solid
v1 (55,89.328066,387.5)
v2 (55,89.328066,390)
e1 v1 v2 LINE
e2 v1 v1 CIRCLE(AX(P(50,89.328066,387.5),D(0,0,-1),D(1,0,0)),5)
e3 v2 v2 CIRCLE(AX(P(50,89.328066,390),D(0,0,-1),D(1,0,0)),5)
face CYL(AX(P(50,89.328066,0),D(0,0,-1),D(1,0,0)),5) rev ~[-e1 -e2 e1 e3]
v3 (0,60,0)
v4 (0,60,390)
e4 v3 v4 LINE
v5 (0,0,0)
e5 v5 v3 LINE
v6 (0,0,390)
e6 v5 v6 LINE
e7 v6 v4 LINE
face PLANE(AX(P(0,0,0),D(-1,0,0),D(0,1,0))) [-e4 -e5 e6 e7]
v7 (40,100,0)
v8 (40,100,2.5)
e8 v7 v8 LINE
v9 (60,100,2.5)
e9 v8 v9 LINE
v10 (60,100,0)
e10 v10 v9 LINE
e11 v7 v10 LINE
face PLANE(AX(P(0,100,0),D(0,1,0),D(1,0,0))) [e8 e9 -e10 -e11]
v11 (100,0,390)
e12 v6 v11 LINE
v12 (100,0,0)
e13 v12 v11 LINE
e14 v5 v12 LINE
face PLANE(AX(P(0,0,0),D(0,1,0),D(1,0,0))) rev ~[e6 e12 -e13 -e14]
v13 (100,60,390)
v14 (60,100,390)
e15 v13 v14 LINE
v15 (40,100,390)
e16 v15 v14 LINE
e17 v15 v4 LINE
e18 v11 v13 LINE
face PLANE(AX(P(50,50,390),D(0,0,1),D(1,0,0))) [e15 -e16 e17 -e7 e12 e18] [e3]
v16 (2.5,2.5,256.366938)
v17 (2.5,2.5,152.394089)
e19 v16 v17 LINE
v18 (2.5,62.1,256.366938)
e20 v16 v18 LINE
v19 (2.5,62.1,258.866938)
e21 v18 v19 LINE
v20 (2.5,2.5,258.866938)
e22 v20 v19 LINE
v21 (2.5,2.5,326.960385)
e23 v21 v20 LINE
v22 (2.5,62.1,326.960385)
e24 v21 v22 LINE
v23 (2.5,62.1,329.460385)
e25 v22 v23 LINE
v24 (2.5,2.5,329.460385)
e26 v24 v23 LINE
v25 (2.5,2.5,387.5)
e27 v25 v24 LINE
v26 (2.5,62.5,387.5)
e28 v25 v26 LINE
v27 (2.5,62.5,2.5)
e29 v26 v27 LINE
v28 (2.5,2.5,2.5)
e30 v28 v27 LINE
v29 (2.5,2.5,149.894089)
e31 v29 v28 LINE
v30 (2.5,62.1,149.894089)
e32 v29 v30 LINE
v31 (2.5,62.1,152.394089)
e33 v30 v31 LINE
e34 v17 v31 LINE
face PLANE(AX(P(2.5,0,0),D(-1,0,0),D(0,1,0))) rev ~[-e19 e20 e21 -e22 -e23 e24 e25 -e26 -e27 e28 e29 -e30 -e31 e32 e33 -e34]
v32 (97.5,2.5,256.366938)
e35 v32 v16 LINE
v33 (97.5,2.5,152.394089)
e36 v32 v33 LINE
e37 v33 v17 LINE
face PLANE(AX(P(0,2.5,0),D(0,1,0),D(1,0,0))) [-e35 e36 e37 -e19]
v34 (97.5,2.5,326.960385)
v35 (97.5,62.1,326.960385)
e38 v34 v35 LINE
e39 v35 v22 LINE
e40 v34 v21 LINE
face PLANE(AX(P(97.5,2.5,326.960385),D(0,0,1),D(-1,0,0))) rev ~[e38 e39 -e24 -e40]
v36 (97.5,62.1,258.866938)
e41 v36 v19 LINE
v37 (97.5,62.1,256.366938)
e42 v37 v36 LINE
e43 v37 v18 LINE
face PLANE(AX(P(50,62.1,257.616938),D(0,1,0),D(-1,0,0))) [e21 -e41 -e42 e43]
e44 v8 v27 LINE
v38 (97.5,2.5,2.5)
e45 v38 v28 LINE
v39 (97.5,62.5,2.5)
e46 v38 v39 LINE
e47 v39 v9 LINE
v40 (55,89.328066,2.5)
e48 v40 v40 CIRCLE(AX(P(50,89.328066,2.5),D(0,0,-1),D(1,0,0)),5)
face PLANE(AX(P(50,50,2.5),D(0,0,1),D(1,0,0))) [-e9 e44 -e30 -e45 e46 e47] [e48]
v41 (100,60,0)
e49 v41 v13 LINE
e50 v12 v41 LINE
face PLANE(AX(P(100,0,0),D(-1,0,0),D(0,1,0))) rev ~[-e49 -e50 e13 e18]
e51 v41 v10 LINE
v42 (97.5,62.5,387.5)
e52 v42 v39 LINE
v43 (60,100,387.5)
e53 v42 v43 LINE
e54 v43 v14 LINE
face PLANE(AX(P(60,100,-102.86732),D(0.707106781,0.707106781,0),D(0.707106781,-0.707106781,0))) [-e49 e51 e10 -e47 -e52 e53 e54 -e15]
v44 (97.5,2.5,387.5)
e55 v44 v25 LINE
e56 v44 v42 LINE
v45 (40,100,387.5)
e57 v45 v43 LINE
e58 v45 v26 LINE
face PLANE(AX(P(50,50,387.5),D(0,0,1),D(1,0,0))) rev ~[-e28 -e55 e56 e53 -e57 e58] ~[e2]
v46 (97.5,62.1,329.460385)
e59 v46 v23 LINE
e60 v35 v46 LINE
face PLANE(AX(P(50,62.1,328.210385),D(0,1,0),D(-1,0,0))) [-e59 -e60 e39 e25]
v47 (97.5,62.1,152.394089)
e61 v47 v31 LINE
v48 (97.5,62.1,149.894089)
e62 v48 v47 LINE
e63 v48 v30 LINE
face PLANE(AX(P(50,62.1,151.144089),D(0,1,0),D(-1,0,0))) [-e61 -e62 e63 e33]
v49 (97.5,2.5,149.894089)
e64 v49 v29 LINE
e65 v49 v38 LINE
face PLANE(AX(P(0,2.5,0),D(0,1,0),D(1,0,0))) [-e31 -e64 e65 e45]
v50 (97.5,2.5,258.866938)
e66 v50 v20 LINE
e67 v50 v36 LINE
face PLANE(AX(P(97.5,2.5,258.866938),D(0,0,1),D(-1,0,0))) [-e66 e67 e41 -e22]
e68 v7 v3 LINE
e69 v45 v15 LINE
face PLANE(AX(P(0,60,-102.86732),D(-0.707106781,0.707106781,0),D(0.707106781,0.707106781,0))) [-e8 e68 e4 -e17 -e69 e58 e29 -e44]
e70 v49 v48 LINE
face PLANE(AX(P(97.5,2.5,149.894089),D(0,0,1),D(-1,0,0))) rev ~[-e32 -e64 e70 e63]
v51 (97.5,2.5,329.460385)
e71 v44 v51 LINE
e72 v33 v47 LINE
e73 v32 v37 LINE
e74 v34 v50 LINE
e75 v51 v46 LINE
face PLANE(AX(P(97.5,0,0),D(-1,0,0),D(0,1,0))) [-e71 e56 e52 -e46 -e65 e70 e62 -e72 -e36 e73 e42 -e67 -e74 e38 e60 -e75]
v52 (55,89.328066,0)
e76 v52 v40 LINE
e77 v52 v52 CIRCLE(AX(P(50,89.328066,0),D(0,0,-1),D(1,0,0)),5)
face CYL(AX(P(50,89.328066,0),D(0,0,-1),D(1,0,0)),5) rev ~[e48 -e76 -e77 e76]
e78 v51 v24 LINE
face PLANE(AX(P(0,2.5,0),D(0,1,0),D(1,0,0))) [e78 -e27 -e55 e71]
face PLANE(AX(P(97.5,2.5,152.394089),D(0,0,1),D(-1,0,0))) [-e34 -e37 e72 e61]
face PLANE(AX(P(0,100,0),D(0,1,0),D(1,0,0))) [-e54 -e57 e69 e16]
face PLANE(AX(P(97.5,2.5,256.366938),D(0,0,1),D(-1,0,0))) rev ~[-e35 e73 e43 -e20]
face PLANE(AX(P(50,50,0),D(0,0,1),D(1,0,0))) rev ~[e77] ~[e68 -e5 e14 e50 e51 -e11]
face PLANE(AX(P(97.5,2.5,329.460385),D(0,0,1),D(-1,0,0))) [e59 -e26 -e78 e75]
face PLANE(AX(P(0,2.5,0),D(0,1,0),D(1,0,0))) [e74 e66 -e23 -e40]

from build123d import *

# Parameters (mm, degrees)
F0_W        = 100
F0_H        = 100
F1_DEPTH    = 390
F2_T        = -2.5
F3_R        = 5
F4_DEPTH    = 2000
F5_T1_DEPTH = 595.7346390373
F6_W        = 95
F6_H        = 2.5
F7_DEPTH    = 59.6


# Not quite as in the source:
# - a fillet or chamfer that OpenCascade refuses, or shapes differently, is made with other operations: its cross-section is extruded or revolved along the edge and cut away or added


with BuildPart() as f1:
    # F0 (on Top) → F1 (new body)
    with BuildSketch(Plane.XY):
        with Locations((50, 50)):
            Rectangle(F0_W, F0_H)
    extrude(amount=F1_DEPTH)

    # F2
    f2_openings = [f1.faces().sort_by_distance(p)[0] for p in [
        (50, 100, 195),
    ]]
    offset(amount=F2_T, openings=f2_openings)

    # F3 (on face) → F4 (cut)
    with BuildSketch(Plane(origin=(0, 0, 0), x_dir=(1, 0, 0), z_dir=(0, 0, -1))):
        with Locations((50, -89.3280655146)):
            Circle(F3_R)
    extrude(amount=-F4_DEPTH, mode=Mode.SUBTRACT)

    # F5: chamfer of 40 on 2 edges, made by hand

    # F5_s2 → F5_t1 (cut)
    with BuildSketch(Plane.XY.offset(-102.8673195186)):
        Polygon((0, 60), (40, 100), (0, 100), align=None)
        Polygon((60, 100), (100, 60), (100, 100), align=None)
    extrude(amount=F5_T1_DEPTH, mode=Mode.SUBTRACT)

    # F6 (on face) → F7 (join)
    with BuildSketch(Plane(origin=(0, 2.5, 0), x_dir=(-1, 0, 0), z_dir=(0, 1, 0))):
        with Locations((-50, 328.2103848457)):
            Rectangle(F6_W, F6_H)
        with Locations((-50, 257.6169383526)):
            Rectangle(F6_W, F6_H)
        with Locations((-50, 151.1440885067)):
            Rectangle(F6_W, F6_H)
    extrude(amount=F7_DEPTH)


solid = f1.part
